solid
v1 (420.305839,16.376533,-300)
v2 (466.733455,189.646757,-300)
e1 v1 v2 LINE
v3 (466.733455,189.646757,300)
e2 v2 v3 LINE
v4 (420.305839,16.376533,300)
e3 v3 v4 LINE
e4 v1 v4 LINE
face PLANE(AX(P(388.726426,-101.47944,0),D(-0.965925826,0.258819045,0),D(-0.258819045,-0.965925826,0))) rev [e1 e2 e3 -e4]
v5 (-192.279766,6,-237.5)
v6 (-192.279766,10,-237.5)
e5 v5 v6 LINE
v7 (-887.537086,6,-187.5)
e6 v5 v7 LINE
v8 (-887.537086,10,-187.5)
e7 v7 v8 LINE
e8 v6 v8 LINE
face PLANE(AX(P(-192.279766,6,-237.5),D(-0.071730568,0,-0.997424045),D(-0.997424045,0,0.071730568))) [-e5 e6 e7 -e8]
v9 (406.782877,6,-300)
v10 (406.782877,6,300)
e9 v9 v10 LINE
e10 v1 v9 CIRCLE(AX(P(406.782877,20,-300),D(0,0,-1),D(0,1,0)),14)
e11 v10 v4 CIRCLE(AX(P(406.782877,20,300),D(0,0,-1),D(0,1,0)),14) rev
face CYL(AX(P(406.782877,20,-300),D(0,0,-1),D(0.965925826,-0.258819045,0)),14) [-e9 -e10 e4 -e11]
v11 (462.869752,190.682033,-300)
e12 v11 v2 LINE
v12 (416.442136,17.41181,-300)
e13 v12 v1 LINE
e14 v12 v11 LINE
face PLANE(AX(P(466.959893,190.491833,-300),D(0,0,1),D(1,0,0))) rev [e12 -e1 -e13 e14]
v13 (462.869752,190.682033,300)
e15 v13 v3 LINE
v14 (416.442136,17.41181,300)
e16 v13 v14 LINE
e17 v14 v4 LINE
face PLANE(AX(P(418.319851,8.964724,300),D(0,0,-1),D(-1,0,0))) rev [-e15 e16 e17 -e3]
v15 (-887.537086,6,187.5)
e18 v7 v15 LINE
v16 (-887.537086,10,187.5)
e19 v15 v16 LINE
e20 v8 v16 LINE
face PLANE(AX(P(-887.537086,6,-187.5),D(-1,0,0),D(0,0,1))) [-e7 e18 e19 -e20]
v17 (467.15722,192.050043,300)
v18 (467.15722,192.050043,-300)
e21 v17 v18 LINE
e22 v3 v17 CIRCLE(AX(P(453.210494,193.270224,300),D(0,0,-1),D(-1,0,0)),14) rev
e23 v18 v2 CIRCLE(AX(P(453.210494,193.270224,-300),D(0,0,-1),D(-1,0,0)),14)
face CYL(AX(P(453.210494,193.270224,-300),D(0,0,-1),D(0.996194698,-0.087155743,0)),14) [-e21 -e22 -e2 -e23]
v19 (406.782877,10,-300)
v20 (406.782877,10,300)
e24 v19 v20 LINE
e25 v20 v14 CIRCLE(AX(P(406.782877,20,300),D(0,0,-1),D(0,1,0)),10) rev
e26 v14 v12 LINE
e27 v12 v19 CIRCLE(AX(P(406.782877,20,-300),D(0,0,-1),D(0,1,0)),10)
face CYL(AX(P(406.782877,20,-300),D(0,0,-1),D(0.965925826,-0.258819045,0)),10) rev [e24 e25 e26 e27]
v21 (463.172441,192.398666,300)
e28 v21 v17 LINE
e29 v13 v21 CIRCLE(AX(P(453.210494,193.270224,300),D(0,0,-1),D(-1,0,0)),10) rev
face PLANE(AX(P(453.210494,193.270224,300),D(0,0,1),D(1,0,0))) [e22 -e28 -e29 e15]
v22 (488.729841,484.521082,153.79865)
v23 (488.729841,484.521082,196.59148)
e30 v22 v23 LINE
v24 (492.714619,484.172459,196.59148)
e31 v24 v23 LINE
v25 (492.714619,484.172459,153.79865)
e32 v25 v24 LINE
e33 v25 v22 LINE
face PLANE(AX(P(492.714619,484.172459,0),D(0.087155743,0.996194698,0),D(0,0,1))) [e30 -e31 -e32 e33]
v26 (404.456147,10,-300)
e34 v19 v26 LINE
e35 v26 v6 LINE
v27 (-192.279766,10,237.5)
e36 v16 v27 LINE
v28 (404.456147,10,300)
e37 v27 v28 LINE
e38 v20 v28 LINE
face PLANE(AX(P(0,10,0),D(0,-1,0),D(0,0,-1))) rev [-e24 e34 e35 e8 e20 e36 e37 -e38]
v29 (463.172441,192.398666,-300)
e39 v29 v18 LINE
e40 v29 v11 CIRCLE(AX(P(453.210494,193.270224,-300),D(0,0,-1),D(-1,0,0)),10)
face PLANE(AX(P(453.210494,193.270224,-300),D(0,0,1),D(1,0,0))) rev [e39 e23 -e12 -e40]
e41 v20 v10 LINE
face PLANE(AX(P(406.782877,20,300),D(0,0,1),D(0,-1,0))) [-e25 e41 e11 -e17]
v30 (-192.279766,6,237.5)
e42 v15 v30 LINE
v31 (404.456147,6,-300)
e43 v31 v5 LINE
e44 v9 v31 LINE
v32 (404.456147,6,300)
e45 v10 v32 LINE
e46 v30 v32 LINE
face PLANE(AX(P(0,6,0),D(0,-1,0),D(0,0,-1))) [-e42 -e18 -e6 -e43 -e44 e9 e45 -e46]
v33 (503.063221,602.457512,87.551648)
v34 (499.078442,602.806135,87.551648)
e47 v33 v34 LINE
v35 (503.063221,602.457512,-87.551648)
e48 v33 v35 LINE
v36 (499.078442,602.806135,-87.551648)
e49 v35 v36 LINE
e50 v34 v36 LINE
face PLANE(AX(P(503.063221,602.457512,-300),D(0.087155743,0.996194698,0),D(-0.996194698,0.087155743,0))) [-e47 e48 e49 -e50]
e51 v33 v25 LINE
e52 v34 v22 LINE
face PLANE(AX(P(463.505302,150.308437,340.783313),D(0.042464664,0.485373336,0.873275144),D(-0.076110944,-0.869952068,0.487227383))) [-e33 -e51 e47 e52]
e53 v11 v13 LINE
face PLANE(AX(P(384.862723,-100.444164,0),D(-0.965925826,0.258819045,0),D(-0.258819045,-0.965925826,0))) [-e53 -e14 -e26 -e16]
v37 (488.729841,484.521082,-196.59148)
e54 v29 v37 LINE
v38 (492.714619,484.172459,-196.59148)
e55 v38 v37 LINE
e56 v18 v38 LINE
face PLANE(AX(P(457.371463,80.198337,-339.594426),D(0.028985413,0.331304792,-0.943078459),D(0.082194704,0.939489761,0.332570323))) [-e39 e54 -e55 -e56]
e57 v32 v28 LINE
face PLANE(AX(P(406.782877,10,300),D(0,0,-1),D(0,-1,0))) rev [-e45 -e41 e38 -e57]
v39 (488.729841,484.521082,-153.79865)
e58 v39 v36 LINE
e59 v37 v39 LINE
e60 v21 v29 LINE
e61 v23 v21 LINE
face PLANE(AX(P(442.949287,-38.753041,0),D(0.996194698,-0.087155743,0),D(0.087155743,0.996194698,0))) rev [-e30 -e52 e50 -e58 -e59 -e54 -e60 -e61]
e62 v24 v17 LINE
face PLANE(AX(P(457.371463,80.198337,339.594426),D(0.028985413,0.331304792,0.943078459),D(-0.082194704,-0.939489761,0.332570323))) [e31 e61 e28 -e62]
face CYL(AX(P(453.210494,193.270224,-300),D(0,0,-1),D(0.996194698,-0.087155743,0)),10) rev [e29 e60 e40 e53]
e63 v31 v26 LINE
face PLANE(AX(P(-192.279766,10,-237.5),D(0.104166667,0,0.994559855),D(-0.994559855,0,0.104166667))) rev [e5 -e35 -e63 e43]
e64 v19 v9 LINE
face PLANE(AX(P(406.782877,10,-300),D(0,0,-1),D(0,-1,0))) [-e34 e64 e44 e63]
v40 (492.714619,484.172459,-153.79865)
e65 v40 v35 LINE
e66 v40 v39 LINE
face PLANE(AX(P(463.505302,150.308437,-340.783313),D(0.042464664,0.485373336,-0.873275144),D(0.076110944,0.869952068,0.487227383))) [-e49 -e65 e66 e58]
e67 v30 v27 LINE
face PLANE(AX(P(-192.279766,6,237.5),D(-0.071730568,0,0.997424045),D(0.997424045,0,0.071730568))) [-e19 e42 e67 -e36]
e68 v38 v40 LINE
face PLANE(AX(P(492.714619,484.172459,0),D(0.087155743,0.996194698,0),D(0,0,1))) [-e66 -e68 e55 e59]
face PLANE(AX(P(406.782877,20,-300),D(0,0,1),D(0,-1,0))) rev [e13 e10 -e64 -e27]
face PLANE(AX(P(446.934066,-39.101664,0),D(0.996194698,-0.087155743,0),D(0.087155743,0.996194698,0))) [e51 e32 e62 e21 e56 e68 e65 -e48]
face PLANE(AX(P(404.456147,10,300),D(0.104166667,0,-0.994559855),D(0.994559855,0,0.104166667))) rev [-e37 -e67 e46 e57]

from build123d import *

# Parameters (mm, degrees)
BOSS_EXTRUDE1_DEPTH          = 10
CONVERT_SOLID1_DEPTH         = 6
EDGE_FLANGE2_DEPTH           = 600
EDGE_FLANGE4_STRIP_CUT_DEPTH = 600
EDGE_FLANGE4_DEPTH           = 600
CUT_EXTRUDE2_DEPTH           = 952.374861111
CUT_EXTRUDE2_DEPTH_BACK      = 952.374861111
TAB1_DEPTH                   = 4


# Read off the part's stored shape, not the designer's step: Convert-Solid1
# Sheet-metal steps are written as plain solids
with BuildPart() as part:
    # Sketch1 → Boss-Extrude1 (new body)
    with BuildSketch(Plane(origin=(0, 0, 0), x_dir=(1, 0, 0), z_dir=(0, 1, 0))):
        Polygon((-192.279765905, 237.5), (404.456147209, 300), (404.456147209, 0), (404.456147209, -300), (-192.279765905, -237.5), align=None)
    extrude(amount=BOSS_EXTRUDE1_DEPTH)

    # Convert-Solid1 outline → Convert-Solid1 (cut)
    with BuildSketch(Plane(origin=(0, 0, 0), x_dir=(1, 0, 0), z_dir=(0, 1, 0))):
        Polygon((-192.279765905, 237.5), (-192.279765905, -237.5), (404.456147209, -300), (404.456147209, 300), align=None)
    extrude(amount=CONVERT_SOLID1_DEPTH, mode=Mode.SUBTRACT)

    # Edge-Flange2 section (across the edge) → Edge-Flange2 (add)
    with BuildSketch(Plane(origin=(414.456147209, 10, 300), x_dir=(-0.9659258262890673, 0.25881904510252446, 0), z_dir=(0, 0, -1))):
        with BuildLine():
            Line((-4, 7.67326988), (-4, 187.930692048))
            Line((-4, 187.930692048), (0, 187.930692048))
            Line((0, 187.930692048), (0, 7.67326988))
            ThreePointArc((0, 7.67326988), (2.066466597, 1.58565559), (7.411809549, -1.985988383))
            Line((7.411809549, -1.985988383), (9.659258263, -2.588190451))
            Line((9.659258263, -2.588190451), (8.623982082, -6.451893756))
            Line((8.623982082, -6.451893756), (6.376533369, -5.849691688))
            ThreePointArc((6.376533369, -5.849691688), (-1.106946764, -0.849390126), (-4, 7.67326988))
        make_face()
    extrude(amount=EDGE_FLANGE2_DEPTH)

    # Edge-Flange4 strip (across the edge) → Edge-Flange4 strip cut (cut)
    with BuildSketch(Plane(origin=(463.09618947, 191.527109002, 300), x_dir=(-0.9961946980917449, 0.0871557427476667, 0), z_dir=(0, 0, -1))):
        Polygon((-10.038642938, 33.896891256), (-3.787308542, -1.556187852), (0.15192247, -0.861595141), (-6.099411926, 34.591483967), align=None)
    extrude(amount=EDGE_FLANGE4_STRIP_CUT_DEPTH, mode=Mode.SUBTRACT)

    # Edge-Flange4 section (across the edge) → Edge-Flange4 (add)
    with BuildSketch(Plane(origin=(463.09618947, 191.527109002, 300), x_dir=(-0.9961946980917449, 0.0871557427476667, 0), z_dir=(0, 0, -1))):
        with BuildLine():
            Line((-4, 0.874886635), (-4, 412.850045346))
            Line((-4, 412.850045346), (0, 412.850045346))
            Line((0, 412.850045346), (0, 0.874886635))
            ThreePointArc((0, 0.874886635), (0.038053019, 0.003329208), (0.15192247, -0.861595141))
            Line((0.15192247, -0.861595141), (-3.787308542, -1.556187852))
            ThreePointArc((-3.787308542, -1.556187852), (-3.946725773, -0.345293763), (-4, 0.874886635))
        make_face()
    extrude(amount=EDGE_FLANGE4_DEPTH)

    # Sketch22 → Cut-Extrude2 (cut, two sides: drawn at the far end of the back side and taken through both)
    with BuildSketch(Plane(origin=(442.9492869, -38.753041121, 0), x_dir=(0, 0, 1), z_dir=(-0.9961946980917449, 0.08715574274766662, 0)).offset(-CUT_EXTRUDE2_DEPTH_BACK)):
        Polygon((300, 232.03466952), (196.591479546, 525.272945681), (153.798650158, 525.272945681), (87.551647761, 644.009828231), (302.699803465, 645.121208779), (304.833664863, 232.03466952), align=None)
        Polygon((-300, 232.03466952), (-196.591479546, 525.272945681), (-153.798650158, 525.272945681), (-87.551647761, 644.009828231), (-302.699803465, 645.121208779), (-304.833664863, 232.03466952), align=None)
    extrude(amount=CUT_EXTRUDE2_DEPTH + CUT_EXTRUDE2_DEPTH_BACK, mode=Mode.SUBTRACT)

    # Sketch24 → Tab1 (add)
    with BuildSketch(Plane(origin=(0, 10, 0), x_dir=(1, 0, 0), z_dir=(0, 1, 0))):
        Polygon((-192.279765905, 237.5), (-887.537085834, 187.5), (-887.537085834, -187.5), (-192.279765905, -237.5), align=None)
    extrude(amount=-TAB1_DEPTH)


solid = part.part
